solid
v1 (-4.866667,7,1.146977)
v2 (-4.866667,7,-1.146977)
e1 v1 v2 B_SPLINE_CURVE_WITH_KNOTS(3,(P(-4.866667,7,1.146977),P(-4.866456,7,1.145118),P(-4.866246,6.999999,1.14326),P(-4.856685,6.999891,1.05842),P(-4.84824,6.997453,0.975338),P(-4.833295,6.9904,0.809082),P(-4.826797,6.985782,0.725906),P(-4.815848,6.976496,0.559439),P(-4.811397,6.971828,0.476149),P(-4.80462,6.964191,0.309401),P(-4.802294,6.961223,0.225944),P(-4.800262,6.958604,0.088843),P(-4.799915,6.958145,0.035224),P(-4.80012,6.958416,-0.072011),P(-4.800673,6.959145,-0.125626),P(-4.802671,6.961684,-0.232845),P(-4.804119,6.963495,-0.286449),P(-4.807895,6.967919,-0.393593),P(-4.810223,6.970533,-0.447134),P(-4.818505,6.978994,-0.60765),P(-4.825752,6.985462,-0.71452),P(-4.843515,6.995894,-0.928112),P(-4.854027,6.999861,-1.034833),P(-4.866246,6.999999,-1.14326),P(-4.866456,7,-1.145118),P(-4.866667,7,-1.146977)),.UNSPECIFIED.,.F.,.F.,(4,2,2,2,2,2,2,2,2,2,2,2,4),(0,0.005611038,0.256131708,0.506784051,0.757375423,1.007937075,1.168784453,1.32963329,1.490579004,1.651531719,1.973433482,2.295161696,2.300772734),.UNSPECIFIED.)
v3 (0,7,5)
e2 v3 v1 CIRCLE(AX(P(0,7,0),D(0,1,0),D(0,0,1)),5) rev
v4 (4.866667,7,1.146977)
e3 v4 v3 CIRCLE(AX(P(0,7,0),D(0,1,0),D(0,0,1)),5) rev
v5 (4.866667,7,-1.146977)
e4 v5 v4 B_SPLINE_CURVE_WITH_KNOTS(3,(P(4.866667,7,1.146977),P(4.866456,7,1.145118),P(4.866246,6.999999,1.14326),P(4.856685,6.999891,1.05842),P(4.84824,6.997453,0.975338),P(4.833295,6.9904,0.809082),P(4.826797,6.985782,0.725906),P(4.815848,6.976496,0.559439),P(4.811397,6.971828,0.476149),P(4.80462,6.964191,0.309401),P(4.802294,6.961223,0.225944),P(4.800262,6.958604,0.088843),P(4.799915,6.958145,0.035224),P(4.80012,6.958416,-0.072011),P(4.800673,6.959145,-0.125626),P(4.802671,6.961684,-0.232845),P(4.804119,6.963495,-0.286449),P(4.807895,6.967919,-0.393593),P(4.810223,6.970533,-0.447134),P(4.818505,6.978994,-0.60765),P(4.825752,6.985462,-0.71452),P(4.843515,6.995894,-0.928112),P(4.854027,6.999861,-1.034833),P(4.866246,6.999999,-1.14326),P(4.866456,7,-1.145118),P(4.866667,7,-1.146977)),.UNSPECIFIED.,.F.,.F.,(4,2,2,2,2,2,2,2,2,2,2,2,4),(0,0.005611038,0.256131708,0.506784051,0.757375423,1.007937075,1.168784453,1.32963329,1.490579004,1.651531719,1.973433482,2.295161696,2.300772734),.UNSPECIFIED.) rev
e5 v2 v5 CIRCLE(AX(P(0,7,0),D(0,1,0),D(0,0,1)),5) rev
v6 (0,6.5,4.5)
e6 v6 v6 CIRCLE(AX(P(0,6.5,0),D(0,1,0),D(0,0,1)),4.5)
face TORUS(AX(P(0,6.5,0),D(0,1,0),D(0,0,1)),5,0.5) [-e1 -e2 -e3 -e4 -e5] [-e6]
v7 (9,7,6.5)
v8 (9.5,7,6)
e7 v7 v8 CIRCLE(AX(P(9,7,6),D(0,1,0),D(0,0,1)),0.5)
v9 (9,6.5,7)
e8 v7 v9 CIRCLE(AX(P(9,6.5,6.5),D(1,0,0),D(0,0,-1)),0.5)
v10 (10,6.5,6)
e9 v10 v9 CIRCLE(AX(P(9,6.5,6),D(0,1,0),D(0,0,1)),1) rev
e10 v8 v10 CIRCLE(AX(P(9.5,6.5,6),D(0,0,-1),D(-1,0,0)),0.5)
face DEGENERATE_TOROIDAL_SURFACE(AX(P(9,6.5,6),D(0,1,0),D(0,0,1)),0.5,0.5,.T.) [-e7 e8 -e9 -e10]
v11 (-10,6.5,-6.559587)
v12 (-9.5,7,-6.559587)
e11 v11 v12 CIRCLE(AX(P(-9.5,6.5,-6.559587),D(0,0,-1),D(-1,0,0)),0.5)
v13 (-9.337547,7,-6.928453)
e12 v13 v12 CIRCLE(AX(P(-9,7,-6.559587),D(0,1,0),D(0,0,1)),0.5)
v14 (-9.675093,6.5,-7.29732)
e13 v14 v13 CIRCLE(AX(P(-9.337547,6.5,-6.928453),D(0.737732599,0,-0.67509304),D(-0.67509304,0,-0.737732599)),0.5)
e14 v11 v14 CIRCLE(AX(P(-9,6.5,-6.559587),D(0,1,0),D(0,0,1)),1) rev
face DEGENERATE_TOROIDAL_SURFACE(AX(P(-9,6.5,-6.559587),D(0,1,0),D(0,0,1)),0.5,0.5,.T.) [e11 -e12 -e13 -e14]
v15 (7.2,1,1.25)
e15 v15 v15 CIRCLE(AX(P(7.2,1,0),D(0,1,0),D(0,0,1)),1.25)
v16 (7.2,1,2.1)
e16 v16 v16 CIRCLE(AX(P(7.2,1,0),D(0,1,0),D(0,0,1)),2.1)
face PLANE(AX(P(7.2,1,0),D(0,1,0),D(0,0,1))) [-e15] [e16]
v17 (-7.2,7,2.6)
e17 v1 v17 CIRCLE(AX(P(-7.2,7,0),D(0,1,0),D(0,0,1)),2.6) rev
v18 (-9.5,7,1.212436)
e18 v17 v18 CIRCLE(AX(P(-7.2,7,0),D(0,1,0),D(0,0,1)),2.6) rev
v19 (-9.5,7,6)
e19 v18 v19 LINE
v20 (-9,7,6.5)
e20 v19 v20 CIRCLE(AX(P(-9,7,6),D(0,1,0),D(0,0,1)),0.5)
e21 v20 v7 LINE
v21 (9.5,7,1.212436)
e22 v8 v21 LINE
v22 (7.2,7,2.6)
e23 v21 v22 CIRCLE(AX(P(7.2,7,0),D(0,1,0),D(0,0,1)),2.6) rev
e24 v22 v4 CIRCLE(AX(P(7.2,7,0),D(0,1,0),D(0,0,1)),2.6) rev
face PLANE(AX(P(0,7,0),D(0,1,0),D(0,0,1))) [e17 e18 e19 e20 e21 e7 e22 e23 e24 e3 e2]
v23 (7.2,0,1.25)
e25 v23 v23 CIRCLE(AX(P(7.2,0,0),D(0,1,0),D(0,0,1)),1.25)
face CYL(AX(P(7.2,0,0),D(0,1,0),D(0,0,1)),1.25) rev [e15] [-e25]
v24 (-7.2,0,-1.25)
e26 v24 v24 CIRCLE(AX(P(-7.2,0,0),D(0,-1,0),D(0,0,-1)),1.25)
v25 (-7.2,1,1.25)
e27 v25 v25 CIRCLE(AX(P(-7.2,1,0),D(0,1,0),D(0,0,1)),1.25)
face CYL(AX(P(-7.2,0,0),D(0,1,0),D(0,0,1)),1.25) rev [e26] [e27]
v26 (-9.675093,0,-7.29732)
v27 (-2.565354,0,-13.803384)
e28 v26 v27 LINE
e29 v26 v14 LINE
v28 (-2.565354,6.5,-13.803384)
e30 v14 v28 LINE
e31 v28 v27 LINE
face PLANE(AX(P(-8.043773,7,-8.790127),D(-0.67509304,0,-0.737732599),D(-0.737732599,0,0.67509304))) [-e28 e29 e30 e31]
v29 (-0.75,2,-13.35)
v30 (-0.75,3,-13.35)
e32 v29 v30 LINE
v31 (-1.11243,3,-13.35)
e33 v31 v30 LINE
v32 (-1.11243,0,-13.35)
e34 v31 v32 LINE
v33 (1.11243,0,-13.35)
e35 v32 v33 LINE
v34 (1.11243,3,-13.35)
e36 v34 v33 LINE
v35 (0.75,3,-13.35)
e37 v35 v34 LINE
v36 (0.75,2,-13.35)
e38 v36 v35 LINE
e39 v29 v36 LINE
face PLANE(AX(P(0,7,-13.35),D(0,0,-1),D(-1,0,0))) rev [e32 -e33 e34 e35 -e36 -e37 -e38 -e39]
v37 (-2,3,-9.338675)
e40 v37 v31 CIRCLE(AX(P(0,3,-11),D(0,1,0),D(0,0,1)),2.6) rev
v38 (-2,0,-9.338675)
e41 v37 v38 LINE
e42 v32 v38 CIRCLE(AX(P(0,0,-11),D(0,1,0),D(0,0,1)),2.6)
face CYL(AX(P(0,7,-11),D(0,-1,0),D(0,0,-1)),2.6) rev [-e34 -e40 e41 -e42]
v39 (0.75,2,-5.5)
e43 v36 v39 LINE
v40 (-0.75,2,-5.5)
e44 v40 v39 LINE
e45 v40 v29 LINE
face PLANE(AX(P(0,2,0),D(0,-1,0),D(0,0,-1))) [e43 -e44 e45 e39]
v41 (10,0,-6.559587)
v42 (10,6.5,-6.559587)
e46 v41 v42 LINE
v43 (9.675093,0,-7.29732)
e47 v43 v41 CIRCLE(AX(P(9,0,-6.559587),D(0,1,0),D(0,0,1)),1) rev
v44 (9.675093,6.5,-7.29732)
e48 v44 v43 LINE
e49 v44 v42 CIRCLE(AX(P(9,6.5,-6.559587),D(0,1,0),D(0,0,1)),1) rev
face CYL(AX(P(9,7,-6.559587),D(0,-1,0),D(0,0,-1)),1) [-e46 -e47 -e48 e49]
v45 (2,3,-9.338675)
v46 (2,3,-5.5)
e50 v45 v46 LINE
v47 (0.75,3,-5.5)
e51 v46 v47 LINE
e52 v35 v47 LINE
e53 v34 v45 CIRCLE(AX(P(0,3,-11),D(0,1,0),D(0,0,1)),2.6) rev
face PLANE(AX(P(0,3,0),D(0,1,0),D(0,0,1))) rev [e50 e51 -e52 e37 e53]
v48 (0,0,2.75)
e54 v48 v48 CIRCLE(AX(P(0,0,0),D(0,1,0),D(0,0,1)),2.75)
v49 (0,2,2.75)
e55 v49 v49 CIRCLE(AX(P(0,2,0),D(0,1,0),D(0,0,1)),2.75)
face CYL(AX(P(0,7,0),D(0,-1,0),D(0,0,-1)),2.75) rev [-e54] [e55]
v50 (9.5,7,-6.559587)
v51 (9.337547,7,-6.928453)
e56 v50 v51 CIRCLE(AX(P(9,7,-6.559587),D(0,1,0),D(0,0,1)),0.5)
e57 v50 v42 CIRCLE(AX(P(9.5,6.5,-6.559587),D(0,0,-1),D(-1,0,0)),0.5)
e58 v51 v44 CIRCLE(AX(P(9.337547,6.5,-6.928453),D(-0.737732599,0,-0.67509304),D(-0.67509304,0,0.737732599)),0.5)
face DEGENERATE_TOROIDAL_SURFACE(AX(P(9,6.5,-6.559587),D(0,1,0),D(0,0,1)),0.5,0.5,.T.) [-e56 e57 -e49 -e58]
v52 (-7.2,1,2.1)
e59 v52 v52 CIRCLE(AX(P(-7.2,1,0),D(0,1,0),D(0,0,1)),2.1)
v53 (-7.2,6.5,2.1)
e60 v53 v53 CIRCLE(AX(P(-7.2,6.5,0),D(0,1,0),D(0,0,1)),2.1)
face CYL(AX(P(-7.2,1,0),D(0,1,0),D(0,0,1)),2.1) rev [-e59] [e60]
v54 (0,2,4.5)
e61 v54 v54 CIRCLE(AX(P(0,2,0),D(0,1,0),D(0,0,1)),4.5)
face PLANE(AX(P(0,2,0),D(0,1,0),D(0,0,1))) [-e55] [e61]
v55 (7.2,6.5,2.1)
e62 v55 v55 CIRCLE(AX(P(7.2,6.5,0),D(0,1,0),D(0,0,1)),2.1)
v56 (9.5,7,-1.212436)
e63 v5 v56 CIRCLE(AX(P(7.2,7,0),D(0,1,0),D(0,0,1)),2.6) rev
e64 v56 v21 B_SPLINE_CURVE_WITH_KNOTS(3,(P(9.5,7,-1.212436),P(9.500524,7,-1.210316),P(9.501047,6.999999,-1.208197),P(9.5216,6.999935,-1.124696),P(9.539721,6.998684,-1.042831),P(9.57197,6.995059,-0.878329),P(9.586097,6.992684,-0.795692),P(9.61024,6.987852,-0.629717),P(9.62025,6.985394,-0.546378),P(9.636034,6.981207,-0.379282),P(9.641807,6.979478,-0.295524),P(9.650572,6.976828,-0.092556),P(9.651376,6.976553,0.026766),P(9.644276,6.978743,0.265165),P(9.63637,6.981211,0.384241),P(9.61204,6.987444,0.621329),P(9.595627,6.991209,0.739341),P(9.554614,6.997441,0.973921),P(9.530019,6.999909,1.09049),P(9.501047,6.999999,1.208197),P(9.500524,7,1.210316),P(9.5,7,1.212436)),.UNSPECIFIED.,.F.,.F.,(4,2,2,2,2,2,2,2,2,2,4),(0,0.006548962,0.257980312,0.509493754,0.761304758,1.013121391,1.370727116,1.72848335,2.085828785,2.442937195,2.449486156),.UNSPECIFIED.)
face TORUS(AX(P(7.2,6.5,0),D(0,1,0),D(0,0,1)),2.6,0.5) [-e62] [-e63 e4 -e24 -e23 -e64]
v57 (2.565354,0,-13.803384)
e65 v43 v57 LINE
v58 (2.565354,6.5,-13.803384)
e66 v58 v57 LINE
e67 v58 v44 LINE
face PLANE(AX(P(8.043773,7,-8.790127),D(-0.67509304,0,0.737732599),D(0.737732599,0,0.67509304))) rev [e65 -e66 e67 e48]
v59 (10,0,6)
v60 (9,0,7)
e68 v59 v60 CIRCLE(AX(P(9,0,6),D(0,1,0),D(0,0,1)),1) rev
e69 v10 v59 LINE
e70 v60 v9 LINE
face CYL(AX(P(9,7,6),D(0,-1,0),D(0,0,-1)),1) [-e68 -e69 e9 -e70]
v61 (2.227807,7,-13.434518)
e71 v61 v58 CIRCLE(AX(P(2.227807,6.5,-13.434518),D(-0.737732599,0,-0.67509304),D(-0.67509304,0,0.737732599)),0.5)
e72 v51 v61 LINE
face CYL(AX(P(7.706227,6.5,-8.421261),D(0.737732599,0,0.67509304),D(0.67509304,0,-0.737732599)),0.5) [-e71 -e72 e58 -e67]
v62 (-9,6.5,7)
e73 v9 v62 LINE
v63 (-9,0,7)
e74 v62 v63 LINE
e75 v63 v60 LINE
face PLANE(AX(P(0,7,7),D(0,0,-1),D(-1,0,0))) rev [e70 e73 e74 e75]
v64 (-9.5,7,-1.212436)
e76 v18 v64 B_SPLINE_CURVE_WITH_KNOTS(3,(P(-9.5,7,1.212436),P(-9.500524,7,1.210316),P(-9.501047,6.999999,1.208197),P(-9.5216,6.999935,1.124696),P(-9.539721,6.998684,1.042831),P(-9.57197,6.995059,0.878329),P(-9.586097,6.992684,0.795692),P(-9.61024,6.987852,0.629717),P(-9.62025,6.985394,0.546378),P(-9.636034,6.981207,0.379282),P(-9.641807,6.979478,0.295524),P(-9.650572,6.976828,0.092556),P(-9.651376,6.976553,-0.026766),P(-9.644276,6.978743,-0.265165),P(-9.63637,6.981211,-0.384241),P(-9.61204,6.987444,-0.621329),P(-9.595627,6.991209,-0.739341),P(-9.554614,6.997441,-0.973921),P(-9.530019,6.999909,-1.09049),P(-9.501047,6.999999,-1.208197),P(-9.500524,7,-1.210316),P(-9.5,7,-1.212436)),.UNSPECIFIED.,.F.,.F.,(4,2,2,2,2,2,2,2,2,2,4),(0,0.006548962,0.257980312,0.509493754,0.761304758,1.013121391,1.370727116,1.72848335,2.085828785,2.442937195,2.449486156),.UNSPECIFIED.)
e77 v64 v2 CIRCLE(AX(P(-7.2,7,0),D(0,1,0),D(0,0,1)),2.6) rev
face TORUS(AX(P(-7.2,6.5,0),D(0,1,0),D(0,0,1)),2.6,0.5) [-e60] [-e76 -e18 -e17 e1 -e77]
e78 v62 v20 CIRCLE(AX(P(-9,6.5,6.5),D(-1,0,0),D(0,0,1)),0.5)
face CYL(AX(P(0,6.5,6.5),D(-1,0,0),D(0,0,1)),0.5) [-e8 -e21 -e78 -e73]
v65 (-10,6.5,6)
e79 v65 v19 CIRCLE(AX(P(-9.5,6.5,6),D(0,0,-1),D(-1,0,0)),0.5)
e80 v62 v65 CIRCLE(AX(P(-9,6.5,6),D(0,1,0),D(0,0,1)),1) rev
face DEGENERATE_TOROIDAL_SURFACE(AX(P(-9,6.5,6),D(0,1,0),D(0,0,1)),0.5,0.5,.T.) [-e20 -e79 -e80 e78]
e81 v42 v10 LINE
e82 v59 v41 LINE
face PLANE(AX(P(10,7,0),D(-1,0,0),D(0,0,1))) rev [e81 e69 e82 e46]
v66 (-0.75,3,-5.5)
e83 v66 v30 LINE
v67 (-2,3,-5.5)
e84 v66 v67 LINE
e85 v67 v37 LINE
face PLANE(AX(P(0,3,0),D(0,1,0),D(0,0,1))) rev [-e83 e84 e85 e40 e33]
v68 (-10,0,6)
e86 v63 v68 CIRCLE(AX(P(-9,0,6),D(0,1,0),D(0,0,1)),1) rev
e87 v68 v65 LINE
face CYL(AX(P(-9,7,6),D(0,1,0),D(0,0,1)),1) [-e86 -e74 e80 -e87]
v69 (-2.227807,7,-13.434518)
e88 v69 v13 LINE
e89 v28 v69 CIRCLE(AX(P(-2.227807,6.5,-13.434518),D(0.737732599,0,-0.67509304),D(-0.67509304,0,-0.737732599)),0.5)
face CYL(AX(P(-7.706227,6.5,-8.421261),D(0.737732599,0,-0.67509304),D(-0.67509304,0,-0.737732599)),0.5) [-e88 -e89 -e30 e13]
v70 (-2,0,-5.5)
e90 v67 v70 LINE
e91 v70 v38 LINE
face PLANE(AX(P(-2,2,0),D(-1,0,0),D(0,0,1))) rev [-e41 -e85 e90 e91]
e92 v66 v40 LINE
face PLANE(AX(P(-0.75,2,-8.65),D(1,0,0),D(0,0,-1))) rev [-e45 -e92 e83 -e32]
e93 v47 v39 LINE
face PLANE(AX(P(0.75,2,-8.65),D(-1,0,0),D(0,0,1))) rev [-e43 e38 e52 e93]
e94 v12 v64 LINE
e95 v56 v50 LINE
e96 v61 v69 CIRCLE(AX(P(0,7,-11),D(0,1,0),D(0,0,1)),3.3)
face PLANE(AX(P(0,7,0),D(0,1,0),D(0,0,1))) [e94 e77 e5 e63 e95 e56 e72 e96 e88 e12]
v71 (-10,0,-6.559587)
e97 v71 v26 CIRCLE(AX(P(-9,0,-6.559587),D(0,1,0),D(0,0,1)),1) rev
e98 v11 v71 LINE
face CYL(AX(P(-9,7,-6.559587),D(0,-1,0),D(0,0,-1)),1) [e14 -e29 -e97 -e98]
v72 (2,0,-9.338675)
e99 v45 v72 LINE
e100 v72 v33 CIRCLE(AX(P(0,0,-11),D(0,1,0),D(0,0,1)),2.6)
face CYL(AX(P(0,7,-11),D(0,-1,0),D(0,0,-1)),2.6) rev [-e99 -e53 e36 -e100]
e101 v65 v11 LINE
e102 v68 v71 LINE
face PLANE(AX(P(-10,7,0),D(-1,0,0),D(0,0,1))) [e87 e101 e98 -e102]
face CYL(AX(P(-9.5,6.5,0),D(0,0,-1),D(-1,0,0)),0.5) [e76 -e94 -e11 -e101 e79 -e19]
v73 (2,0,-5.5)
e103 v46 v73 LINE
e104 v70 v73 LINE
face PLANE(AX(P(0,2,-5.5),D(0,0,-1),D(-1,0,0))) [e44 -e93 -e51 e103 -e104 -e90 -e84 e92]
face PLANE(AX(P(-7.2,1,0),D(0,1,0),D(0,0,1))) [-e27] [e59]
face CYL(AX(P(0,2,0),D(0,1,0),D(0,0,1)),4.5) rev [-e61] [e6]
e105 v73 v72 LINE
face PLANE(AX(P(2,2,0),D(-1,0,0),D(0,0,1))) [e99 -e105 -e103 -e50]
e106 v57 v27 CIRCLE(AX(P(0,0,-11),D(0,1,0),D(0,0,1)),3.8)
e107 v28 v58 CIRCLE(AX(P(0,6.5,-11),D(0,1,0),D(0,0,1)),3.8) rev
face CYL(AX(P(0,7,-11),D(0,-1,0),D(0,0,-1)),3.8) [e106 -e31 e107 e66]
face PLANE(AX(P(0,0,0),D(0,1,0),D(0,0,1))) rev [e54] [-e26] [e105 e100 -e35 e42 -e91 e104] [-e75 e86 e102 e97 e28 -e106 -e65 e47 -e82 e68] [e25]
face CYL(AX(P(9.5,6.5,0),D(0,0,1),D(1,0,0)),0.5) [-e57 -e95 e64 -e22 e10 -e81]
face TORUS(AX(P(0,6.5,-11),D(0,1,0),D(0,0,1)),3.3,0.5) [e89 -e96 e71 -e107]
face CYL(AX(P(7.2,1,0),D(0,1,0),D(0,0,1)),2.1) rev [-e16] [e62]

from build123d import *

# Parameters (mm, degrees)
SKETCH_1_W          = 20
SKETCH_1_H          = 14
SKETCH_1_R          = 2.75
SKETCH_1_R_2        = 3.8
SKETCH_1_R_3        = 2.6
EXTRUDE_1_DEPTH     = 7
CUT_EXTRUDE_START   = -5
SKETCH_2_R          = 4.5
SKETCH_2_R_2        = 2.75
CUT_EXTRUDE_1_DEPTH = 5
SKETCH_8_R          = 1.25
CUT_EXTRUDE_3_DEPTH = 20.184368637
SKETCH_9_R          = 2.1
SKETCH_9_R_2        = 1.25
CUT_EXTRUDE_4_DEPTH = 6
EXTRUDE_START       = -4
EXTRUDE_2_DEPTH     = 4
SKETCH_11_W         = 1.5
SKETCH_11_H         = 4.7
EXTRUDE_3_DEPTH     = 1
CUT_EXTRUDE_5_DEPTH = 2
CUT_EXTRUDE_6_DEPTH = 1
FILLET_1_R          = 1
FILLET_2_R          = 0.5


with BuildPart() as part:
    # Эскиз1 → Бобышка-Вытянуть1 (new body)
    # profile 1 of 5: a face of its own
    with BuildSketch(Plane(origin=(0, 0, 0), x_dir=(1, 0, 0), z_dir=(0, 1, 0))):
        Rectangle(SKETCH_1_W, SKETCH_1_H)
        with Locations(Location((0, 0, 0), (0, 0, 270))):
            Circle(SKETCH_1_R, mode=Mode.SUBTRACT)
    # profile 2 of 5: a face of its own
    with BuildSketch(Plane(origin=(0, 0, 0), x_dir=(1, 0, 0), z_dir=(0, 1, 0))):
        with BuildLine():
            Line((-2.565353551, 13.803383877), (-10, 7))
            Line((-10, 7), (10, 7))
            Line((10, 7), (2.565353551, 13.803383877))
            ThreePointArc((2.565353551, 13.803383877), (3.477667573, 12.531609694), (3.8, 11))
            ThreePointArc((3.8, 11), (-1.531609694, 7.522332427), (-2.565353551, 13.803383877))
        make_face()
    # profile 3 of 5: a face of its own
    with BuildSketch(Plane(origin=(0, 0, 0), x_dir=(1, 0, 0), z_dir=(0, 1, 0))):
        with Locations((0, 11)):
            Circle(SKETCH_1_R_2)
        with Locations((0, 11)):
            Circle(SKETCH_1_R_3, mode=Mode.SUBTRACT)
    # profile 4 of 5: a face of its own
    with BuildSketch(Plane(origin=(0, 0, 0), x_dir=(1, 0, 0), z_dir=(0, 1, 0))):
        with BuildLine():
            ThreePointArc((1.112429773, 13.35), (0, 13.6), (-1.112429773, 13.35))
            Line((-1.112429773, 13.35), (1.112429773, 13.35))
        make_face()
    # profile 5 of 5: a face of its own
    with BuildSketch(Plane(origin=(0, 0, 0), x_dir=(1, 0, 0), z_dir=(0, 1, 0))):
        with BuildLine():
            Line((1.112429773, 8.65), (-1.112429773, 8.65))
            ThreePointArc((-1.112429773, 8.65), (0, 8.4), (1.112429773, 8.65))
        make_face()
    extrude(amount=EXTRUDE_1_DEPTH)

    # Эскиз2 → Вырез-Вытянуть1 (cut)
    with BuildSketch(Plane(origin=(0, 7, 0), x_dir=(1, 0, 0), z_dir=(0, 1, 0)).offset(CUT_EXTRUDE_START)):
        with Locations(Location((0, 0, 0), (0, 0, 270))):
            Circle(SKETCH_2_R)
        with Locations(Location((0, 0, 0), (0, 0, 270))):
            Circle(SKETCH_2_R_2, mode=Mode.SUBTRACT)
    extrude(amount=CUT_EXTRUDE_1_DEPTH, mode=Mode.SUBTRACT)

    # Эскиз8 → Вырез-Вытянуть3 (cut, through all)
    with BuildSketch(Plane(origin=(0, 7, 0), x_dir=(1, 0, 0), z_dir=(0, 1, 0))):
        with Locations(Location((7.2, 0, 0), (0, 0, 270))):
            Circle(SKETCH_8_R)
        with Locations(Location((-7.2, 0, 0), (0, 0, 90))):
            Circle(SKETCH_8_R)
    extrude(amount=-CUT_EXTRUDE_3_DEPTH, mode=Mode.SUBTRACT)

    # Эскиз9 → Вырез-Вытянуть4 (cut)
    # profile 1 of 2: a face of its own
    with BuildSketch(Plane(origin=(0, 7, 0), x_dir=(1, 0, 0), z_dir=(0, 1, 0))):
        with Locations(Location((-7.2, 0, 0), (0, 0, 270))):
            Circle(SKETCH_9_R)
        with Locations(Location((-7.2, 0, 0), (0, 0, 270))):
            Circle(SKETCH_9_R_2, mode=Mode.SUBTRACT)
    # profile 2 of 2: a face of its own
    with BuildSketch(Plane(origin=(0, 7, 0), x_dir=(1, 0, 0), z_dir=(0, 1, 0))):
        with Locations(Location((7.2, 0, 0), (0, 0, 270))):
            Circle(SKETCH_9_R)
        with Locations(Location((7.2, 0, 0), (0, 0, 270))):
            Circle(SKETCH_9_R_2, mode=Mode.SUBTRACT)
    extrude(amount=-CUT_EXTRUDE_4_DEPTH, mode=Mode.SUBTRACT)

    # Эскиз10 → Бобышка-Вытянуть2 (add)
    with BuildSketch(Plane(origin=(0, 7, 0), x_dir=(1, 0, 0), z_dir=(0, 1, 0)).offset(EXTRUDE_START)):
        with BuildLine():
            ThreePointArc((1.112429773, 13.35), (2.6, 11), (1.112429773, 8.65))
            Line((1.112429773, 8.65), (-1.112429773, 8.65))
            ThreePointArc((-1.112429773, 8.65), (-2.6, 11), (-1.112429773, 13.35))
            Line((-1.112429773, 13.35), (1.112429773, 13.35))
        make_face()
    extrude(amount=EXTRUDE_2_DEPTH)

    # Эскиз11 → Бобышка-Вытянуть3 (add)
    with BuildSketch(Plane.XZ.offset(-3)):
        with Locations((0, -11)):
            Rectangle(SKETCH_11_W, SKETCH_11_H)
    extrude(amount=EXTRUDE_3_DEPTH)

    # Эскиз12 → Вырез-Вытянуть5 (cut)
    with BuildSketch(Plane.XZ):
        Polygon((-2, -5.5), (-2, -8.65), (-1.112429773, -8.65), (1.112429773, -8.65), (2, -8.65), (2, -5.5), align=None)
        with BuildLine():
            Line((-1.112429773, -8.65), (-2, -8.65))
            Line((-2, -8.65), (-2, -9.338675227))
            ThreePointArc((-2, -9.338675227), (-1.593854813, -8.945826971), (-1.112429773, -8.65))
        make_face()
        with BuildLine():
            Line((2, -8.65), (1.112429773, -8.65))
            ThreePointArc((1.112429773, -8.65), (1.593854813, -8.945826971), (2, -9.338675227))
            Line((2, -9.338675227), (2, -8.65))
        make_face()
    extrude(amount=-CUT_EXTRUDE_5_DEPTH, mode=Mode.SUBTRACT)

    # Эскиз13 → Вырез-Вытянуть6 (cut)
    with BuildSketch(Plane.XZ.offset(-2)):
        with BuildLine():
            Line((2, -5.5), (0.75, -5.5))
            Line((0.75, -5.5), (0.75, -8.65))
            Line((0.75, -8.65), (1.112429773, -8.65))
            ThreePointArc((1.112429773, -8.65), (1.593854813, -8.945826971), (2, -9.338675227))
            Line((2, -9.338675227), (2, -5.5))
        make_face()
        with BuildLine():
            Line((-1.112429773, -8.65), (-0.75, -8.65))
            Line((-0.75, -8.65), (-0.75, -5.5))
            Line((-0.75, -5.5), (-2, -5.5))
            Line((-2, -5.5), (-2, -9.338675227))
            ThreePointArc((-2, -9.338675227), (-1.593854813, -8.945826971), (-1.112429773, -8.65))
        make_face()
    extrude(amount=-CUT_EXTRUDE_6_DEPTH, mode=Mode.SUBTRACT)

    # Скругление1
    fillet_1_edges = [part.edges().sort_by_distance(p)[0] for p in [
        (-10, 3.5, 7),
        (-10, 3.5, -7),
        (10, 3.5, -7),
        (10, 3.5, 7),
    ]]
    fillet(fillet_1_edges, radius=FILLET_1_R)

    # Скругление2
    # the kernel refuses this fillet: 0.5 mm, written as the material it takes off along each edge
    with BuildSketch(Plane(origin=(-10, 7, -6.559587091), x_dir=(1, 0, 0), z_dir=(0, 0, 1)), Plane(origin=(10, 7, 6), x_dir=(-1, 0, 0), z_dir=(0, 0, -1))) as fillet_2_piece_1:
        with BuildLine():
            CenterArc((FILLET_2_R, -FILLET_2_R), FILLET_2_R, 90, 90)
            Line((0, -FILLET_2_R), (0, 0))
            Line((0, 0), (FILLET_2_R, 0))
        make_face()
    extrude(amount=12.559587091, mode=Mode.SUBTRACT)
    with BuildSketch(Plane(origin=(-2.565353551, 7, -13.803383877), x_dir=(0.6750930396508724, 0, 0.7377325991271809), z_dir=(-0.7377325991271809, 0, 0.6750930396508723)), Plane(origin=(9.67509304, 7, -7.29731969), x_dir=(-0.6750930396508725, 0, 0.7377325991271807), z_dir=(-0.7377325991271807, 0, -0.6750930396508726))) as fillet_2_piece_2:
        with BuildLine():
            CenterArc((FILLET_2_R, -FILLET_2_R), FILLET_2_R, 90, 90)
            Line((0, -FILLET_2_R), (0, 0))
            Line((0, 0), (FILLET_2_R, 0))
        make_face()
    extrude(amount=9.63728524, mode=Mode.SUBTRACT)
    with BuildSketch(Plane(origin=(-9, 7, 7), x_dir=(0, -1, 0), z_dir=(1, 0, 0))) as fillet_2_piece_3:
        with BuildLine():
            CenterArc((FILLET_2_R, FILLET_2_R), FILLET_2_R, 180, 90)
            Line((0, FILLET_2_R), (0, 0))
            Line((0, 0), (FILLET_2_R, 0))
        make_face()
    extrude(amount=18, mode=Mode.SUBTRACT)
    with BuildSketch(Plane(origin=(9, 7, -6.559587091), x_dir=(0.6750930396508728, 0, -0.7377325991271806), z_dir=(-0.7377325991271806, 0, -0.6750930396508728))) as fillet_2_piece_4:
        with BuildLine():
            CenterArc((1 - FILLET_2_R, FILLET_2_R), FILLET_2_R, 270, 90)
            Line((1, FILLET_2_R), (1, 0))
            Line((1, 0), (1 - FILLET_2_R, 0))
        make_face()
    revolve(axis=Axis((9, 7, -6.559587091), (0, -1, 0)), revolution_arc=47.538624316, mode=Mode.SUBTRACT)
    with BuildSketch(Plane(origin=(9, 7, 6), x_dir=(0, 0, 1), z_dir=(-1, 0, 0))) as fillet_2_piece_5:
        with BuildLine():
            CenterArc((1 - FILLET_2_R, -FILLET_2_R), FILLET_2_R, 0, 90)
            Line((1 - FILLET_2_R, 0), (1, 0))
            Line((1, 0), (1, -FILLET_2_R))
        make_face()
    revolve(axis=Axis((9, 7, 6), (0, 1, 0)), revolution_arc=90, mode=Mode.SUBTRACT)
    with BuildSketch(Plane(origin=(-9, 7, 6), x_dir=(0, 0, 1), z_dir=(1, 0, 0))) as fillet_2_piece_6:
        with BuildLine():
            CenterArc((1 - FILLET_2_R, FILLET_2_R), FILLET_2_R, 270, 90)
            Line((1 - FILLET_2_R, 0), (1, 0))
            Line((1, 0), (1, FILLET_2_R))
        make_face()
    revolve(axis=Axis((-9, 7, 6), (0, -1, 0)), revolution_arc=90, mode=Mode.SUBTRACT)
    with BuildSketch(Plane(origin=(-9, 7, -6.559587091), x_dir=(-0.6750930396508718, 0, -0.7377325991271815), z_dir=(0.7377325991271815, 0, -0.6750930396508718))) as fillet_2_piece_7:
        with BuildLine():
            CenterArc((1 - FILLET_2_R, -FILLET_2_R), FILLET_2_R, 0, 90)
            Line((1, -FILLET_2_R), (1, 0))
            Line((1, 0), (1 - FILLET_2_R, 0))
        make_face()
    revolve(axis=Axis((-9, 7, -6.559587091), (0, 1, 0)), revolution_arc=47.538624316, mode=Mode.SUBTRACT)
    with BuildSketch(Plane(origin=(0, 7, -11), x_dir=(0.6750930396508724, 0, -0.7377325991271808), z_dir=(0.7377325991271808, 0, 0.6750930396508724))) as fillet_2_piece_8:
        with BuildLine():
            CenterArc((3.8 - FILLET_2_R, -FILLET_2_R), FILLET_2_R, 0, 90)
            Line((3.8, -FILLET_2_R), (3.8, 0))
            Line((3.8, 0), (3.8 - FILLET_2_R, 0))
        make_face()
    revolve(axis=Axis((0, 7, -11), (0, 1, 0)), revolution_arc=84.922751368, mode=Mode.SUBTRACT)
    with BuildSketch(Plane(origin=(0, 7, 0), x_dir=(0, 0, 1), z_dir=(-1, 0, 0))) as fillet_2_piece_9:
        with BuildLine():
            CenterArc((4.5 + FILLET_2_R, -FILLET_2_R), FILLET_2_R, 90, 90)
            Line((4.5, -FILLET_2_R), (4.5, 0))
            Line((4.5, 0), (4.5 + FILLET_2_R, 0))
        make_face()
    revolve(axis=Axis((0, 7, 0), (0, 1, 0)), mode=Mode.SUBTRACT)
    with BuildSketch(Plane(origin=(-7.2, 7, 0), x_dir=(0, 0, 1), z_dir=(-1, 0, 0))) as fillet_2_piece_10:
        with BuildLine():
            CenterArc((2.1 + FILLET_2_R, -FILLET_2_R), FILLET_2_R, 90, 90)
            Line((2.1, -FILLET_2_R), (2.1, 0))
            Line((2.1, 0), (2.1 + FILLET_2_R, 0))
        make_face()
    revolve(axis=Axis((-7.2, 7, 0), (0, 1, 0)), mode=Mode.SUBTRACT)
    with BuildSketch(Plane(origin=(7.2, 7, 0), x_dir=(0, 0, 1), z_dir=(-1, 0, 0))) as fillet_2_piece_11:
        with BuildLine():
            CenterArc((2.1 + FILLET_2_R, -FILLET_2_R), FILLET_2_R, 90, 90)
            Line((2.1, -FILLET_2_R), (2.1, 0))
            Line((2.1, 0), (2.1 + FILLET_2_R, 0))
        make_face()
    revolve(axis=Axis((7.2, 7, 0), (0, 1, 0)), mode=Mode.SUBTRACT)


solid = part.part
